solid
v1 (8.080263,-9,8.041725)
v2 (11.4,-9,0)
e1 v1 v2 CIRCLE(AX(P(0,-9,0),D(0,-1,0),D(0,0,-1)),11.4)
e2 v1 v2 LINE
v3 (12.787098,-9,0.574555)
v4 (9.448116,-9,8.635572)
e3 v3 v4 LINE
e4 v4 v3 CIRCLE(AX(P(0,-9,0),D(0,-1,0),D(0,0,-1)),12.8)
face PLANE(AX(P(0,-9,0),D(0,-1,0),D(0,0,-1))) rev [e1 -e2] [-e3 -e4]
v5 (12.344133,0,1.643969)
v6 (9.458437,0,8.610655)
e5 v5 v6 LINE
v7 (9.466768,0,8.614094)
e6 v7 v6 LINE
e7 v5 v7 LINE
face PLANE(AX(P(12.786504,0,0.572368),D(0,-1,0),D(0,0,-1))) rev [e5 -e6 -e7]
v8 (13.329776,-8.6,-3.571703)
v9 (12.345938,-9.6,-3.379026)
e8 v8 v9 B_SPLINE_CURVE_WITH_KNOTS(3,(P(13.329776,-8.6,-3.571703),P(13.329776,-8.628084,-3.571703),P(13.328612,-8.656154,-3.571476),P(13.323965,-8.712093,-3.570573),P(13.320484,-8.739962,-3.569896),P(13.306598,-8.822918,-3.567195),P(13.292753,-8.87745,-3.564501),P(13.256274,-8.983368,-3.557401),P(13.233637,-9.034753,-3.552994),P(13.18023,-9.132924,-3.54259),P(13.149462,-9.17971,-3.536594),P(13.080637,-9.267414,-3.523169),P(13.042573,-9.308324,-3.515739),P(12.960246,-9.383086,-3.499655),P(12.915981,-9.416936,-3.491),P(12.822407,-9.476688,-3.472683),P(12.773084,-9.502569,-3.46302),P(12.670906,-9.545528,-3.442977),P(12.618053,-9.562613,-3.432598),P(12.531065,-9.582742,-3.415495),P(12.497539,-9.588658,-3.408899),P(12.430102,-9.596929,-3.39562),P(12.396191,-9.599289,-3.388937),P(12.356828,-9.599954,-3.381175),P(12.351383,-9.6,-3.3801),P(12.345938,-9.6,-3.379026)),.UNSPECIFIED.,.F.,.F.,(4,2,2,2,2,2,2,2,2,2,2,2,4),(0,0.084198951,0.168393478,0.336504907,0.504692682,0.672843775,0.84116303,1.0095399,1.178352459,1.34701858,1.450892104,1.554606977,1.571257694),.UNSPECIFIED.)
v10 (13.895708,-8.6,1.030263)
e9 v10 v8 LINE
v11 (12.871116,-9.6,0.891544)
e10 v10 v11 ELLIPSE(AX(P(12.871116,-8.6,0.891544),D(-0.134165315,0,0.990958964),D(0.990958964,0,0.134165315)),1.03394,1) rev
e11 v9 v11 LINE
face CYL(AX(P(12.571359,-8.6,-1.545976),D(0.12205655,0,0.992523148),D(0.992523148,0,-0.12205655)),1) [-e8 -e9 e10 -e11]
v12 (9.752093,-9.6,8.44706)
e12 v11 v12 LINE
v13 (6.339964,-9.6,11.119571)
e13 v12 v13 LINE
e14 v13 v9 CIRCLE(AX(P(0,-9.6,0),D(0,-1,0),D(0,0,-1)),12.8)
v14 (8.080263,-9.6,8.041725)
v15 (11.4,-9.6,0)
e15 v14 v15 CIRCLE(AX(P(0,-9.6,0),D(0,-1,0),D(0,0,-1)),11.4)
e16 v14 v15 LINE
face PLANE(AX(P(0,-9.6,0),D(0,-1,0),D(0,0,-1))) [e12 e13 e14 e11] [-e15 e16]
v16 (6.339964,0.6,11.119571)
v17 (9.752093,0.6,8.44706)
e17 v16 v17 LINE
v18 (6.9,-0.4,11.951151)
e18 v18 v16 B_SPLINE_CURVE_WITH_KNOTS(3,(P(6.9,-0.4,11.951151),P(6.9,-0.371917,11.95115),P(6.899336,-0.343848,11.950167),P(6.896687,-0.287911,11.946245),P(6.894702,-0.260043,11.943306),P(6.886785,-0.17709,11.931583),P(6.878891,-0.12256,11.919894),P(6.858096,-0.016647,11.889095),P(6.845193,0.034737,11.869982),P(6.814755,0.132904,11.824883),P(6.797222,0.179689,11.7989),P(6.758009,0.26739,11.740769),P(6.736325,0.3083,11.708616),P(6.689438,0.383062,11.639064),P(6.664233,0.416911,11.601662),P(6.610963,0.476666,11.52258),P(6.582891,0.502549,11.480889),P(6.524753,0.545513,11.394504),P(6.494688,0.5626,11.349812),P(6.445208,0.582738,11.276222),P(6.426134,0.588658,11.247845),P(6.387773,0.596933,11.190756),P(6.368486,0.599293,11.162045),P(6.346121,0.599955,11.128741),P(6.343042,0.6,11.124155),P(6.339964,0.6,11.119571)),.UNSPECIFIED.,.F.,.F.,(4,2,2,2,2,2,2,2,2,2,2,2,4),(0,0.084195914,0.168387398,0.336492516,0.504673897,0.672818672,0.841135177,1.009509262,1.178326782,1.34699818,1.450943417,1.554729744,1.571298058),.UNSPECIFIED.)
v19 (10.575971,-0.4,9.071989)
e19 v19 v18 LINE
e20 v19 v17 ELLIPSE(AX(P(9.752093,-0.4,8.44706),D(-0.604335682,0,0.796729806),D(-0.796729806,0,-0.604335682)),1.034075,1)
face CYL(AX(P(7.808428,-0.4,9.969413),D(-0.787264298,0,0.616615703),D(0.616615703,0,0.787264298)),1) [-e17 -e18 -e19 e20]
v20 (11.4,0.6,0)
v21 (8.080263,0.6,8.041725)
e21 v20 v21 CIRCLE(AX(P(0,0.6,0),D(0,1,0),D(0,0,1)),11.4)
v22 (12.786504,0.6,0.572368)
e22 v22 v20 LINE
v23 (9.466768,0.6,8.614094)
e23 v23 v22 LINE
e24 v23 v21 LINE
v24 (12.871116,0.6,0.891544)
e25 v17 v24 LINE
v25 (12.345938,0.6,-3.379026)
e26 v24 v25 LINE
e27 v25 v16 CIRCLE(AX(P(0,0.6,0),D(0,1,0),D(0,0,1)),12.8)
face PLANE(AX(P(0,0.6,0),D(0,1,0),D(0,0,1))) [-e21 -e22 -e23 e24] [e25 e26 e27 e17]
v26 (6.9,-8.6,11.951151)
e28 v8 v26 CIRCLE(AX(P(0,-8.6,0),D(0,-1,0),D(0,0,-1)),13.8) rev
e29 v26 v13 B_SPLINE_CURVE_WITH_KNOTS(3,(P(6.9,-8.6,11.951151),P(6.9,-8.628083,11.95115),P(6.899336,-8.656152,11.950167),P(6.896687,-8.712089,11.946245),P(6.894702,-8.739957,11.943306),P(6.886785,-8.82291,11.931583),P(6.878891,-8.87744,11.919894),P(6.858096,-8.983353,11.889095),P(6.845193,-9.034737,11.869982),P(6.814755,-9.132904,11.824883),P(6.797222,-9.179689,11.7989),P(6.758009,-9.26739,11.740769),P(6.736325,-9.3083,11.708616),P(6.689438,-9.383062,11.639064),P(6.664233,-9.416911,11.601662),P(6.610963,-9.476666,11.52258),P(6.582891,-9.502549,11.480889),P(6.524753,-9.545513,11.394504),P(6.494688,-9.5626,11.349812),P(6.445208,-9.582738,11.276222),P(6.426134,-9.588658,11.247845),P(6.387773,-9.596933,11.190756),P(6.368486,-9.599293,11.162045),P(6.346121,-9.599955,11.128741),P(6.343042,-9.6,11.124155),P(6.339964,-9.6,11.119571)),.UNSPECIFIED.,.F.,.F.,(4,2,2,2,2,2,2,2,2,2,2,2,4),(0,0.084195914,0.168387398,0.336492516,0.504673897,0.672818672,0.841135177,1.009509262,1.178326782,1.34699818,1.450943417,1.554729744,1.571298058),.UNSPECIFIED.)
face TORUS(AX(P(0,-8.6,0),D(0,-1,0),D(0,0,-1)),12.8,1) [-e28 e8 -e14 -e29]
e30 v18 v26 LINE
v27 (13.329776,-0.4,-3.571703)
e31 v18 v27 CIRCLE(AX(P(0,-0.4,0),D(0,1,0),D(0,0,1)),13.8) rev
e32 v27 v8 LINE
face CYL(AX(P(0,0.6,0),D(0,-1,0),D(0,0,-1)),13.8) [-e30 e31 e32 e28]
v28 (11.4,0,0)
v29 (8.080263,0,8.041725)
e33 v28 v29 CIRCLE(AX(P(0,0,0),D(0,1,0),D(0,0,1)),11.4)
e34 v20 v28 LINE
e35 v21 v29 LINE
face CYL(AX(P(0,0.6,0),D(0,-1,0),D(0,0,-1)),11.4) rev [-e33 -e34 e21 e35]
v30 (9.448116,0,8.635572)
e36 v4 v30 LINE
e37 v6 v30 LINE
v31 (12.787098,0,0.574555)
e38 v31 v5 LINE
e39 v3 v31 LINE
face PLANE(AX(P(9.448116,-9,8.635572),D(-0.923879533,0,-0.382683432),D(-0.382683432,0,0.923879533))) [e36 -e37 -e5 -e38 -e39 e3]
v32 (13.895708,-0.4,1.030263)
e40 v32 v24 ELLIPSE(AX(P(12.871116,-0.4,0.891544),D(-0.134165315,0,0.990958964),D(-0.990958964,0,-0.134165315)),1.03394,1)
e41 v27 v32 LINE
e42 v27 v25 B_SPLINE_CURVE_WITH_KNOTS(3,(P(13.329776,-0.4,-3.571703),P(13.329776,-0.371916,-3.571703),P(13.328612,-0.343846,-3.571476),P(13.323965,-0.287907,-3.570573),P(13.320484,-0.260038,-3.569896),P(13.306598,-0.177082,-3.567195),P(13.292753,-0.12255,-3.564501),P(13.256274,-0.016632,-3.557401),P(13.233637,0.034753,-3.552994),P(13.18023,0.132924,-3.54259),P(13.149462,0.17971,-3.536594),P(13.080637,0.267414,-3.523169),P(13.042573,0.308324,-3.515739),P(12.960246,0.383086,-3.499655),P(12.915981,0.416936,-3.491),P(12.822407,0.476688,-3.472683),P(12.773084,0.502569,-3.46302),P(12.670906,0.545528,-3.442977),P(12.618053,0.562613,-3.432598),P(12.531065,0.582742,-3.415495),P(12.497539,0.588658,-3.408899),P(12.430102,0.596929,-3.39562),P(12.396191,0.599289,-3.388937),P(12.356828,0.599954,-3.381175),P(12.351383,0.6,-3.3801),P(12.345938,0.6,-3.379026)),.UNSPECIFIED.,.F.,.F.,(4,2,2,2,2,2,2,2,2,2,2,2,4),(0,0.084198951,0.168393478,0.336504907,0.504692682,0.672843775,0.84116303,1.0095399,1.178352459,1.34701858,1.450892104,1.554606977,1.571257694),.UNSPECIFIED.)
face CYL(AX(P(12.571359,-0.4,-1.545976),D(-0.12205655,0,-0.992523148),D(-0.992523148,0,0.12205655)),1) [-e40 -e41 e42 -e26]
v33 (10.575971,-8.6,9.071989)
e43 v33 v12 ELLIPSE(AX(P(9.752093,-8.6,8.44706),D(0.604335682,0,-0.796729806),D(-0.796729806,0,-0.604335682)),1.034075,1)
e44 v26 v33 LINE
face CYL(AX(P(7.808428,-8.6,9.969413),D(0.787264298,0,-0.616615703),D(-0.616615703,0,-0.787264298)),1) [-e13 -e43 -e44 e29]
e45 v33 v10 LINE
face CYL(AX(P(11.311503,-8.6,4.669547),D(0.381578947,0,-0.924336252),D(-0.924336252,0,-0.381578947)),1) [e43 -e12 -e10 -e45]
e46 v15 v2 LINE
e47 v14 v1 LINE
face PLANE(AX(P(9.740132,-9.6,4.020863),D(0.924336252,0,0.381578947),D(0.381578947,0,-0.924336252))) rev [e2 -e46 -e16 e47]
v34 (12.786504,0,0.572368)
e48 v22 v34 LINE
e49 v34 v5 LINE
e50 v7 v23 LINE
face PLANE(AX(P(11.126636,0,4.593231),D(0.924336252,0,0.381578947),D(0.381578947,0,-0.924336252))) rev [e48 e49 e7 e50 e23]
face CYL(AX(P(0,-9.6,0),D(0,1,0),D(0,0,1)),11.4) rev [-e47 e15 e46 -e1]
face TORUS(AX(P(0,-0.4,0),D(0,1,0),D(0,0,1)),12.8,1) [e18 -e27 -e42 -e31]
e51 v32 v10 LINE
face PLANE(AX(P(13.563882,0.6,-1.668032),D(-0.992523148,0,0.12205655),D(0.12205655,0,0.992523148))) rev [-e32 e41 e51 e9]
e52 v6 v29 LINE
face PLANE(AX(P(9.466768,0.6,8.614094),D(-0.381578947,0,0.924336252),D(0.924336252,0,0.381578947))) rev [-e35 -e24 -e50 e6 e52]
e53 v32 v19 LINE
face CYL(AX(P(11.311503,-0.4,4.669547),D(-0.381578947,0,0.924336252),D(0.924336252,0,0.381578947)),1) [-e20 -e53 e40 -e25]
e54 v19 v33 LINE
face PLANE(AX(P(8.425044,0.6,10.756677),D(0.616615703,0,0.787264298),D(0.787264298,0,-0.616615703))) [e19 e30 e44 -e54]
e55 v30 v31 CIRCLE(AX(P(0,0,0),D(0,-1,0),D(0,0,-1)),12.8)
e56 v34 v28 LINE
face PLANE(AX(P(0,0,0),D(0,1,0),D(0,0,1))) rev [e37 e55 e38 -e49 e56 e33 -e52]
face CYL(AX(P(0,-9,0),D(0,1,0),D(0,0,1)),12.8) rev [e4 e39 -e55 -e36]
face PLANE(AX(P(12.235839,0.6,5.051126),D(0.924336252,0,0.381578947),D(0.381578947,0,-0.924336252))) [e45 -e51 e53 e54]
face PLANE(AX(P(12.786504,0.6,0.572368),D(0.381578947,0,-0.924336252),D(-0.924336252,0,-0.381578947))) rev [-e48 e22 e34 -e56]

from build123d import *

# Parameters (mm, degrees)
EXTRUDE_1_DEPTH     = 0.6
EXTRUDE_START       = 9
EXTRUDE_3_DEPTH     = 9
EXTRUDE_START_2     = 0.6
EXTRUDE_4_DEPTH     = 0.6
FILLET_1_R          = 1
FILLET_2_R          = 1
SKETCH_7_W          = 8.7
SKETCH_7_H          = 0.6
CUT_EXTRUDE_1_DEPTH = 1.5


with BuildPart() as part:
    # 草图1 → 凸台-拉伸1 (new body)
    with BuildSketch(Plane(origin=(0, 0, 0), x_dir=(1, 0, 0), z_dir=(0, 1, 0))):
        with BuildLine():
            Line((10.575971039, -9.071988551), (13.895707881, -1.030263158))
            Line((13.895707881, -1.030263158), (13.329776403, 3.571702822))
            ThreePointArc((13.329776403, 3.571702822), (-12.749537549, 5.281031367), (6.9, -11.951150572))
            Line((6.9, -11.951150572), (10.575971039, -9.071988551))
        make_face()
        with BuildLine():
            ThreePointArc((8.080263158, -8.041725393), (-10.537433274, 4.35), (11.4, 0))
            Line((11.4, 0), (8.080263158, -8.041725393))
        make_face(mode=Mode.SUBTRACT)
    extrude(amount=EXTRUDE_1_DEPTH)

    # 草图2 → 凸台-拉伸3 (add)
    with BuildSketch(Plane(origin=(0, 0, 0), x_dir=(-1, 0, 0), z_dir=(0, -1, 0)).offset(EXTRUDE_START)):
        with BuildLine():
            Line((-13.895707881, -1.030263158), (-10.575971039, -9.071988551))
            Line((-10.575971039, -9.071988551), (-6.9, -11.951150572))
            ThreePointArc((-6.9, -11.951150572), (12.749537549, 5.281031367), (-13.329776403, 3.571702822))
            Line((-13.329776403, 3.571702822), (-13.895707881, -1.030263158))
        make_face()
        with BuildLine():
            Line((-9.448115748, -8.635572293), (-12.787098442, -0.574554987))
            ThreePointArc((-12.787098442, -0.574554987), (11.825658016, 4.898347934), (-9.448115748, -8.635572293))
        make_face(mode=Mode.SUBTRACT)
    extrude(amount=-EXTRUDE_3_DEPTH)

    # 草图5 → 凸台-拉伸4 (add)
    with BuildSketch(Plane(origin=(0, -9, 0), x_dir=(-1, 0, 0), z_dir=(0, -1, 0)).offset(EXTRUDE_START_2)):
        with BuildLine():
            Line((-13.895707881, -1.030263158), (-10.575971039, -9.071988551))
            Line((-10.575971039, -9.071988551), (-6.9, -11.951150572))
            ThreePointArc((-6.9, -11.951150572), (12.749537549, 5.281031367), (-13.329776403, 3.571702822))
            Line((-13.329776403, 3.571702822), (-13.895707881, -1.030263158))
        make_face()
        with BuildLine():
            ThreePointArc((-11.4, 0), (10.537433274, 4.35), (-8.080263158, -8.041725393))
            Line((-8.080263158, -8.041725393), (-11.4, 0))
        make_face(mode=Mode.SUBTRACT)
    extrude(amount=-EXTRUDE_4_DEPTH)

    # 圆角1
    fillet_1_edges = [part.edges().sort_by_distance(p)[0] for p in [
        (13.612742142, -9.6, -1.270719832),
        (-12.749537549, -9.6, -5.281031367),
        (8.737985519, -9.6, 10.511569562),
        (12.23583946, -9.6, 5.051125854),
    ]]
    fillet(fillet_1_edges, radius=FILLET_1_R)

    # 圆角2
    fillet_2_edges = [part.edges().sort_by_distance(p)[0] for p in [
        (13.612742142, 0.6, -1.270719832),
        (-12.749537549, 0.6, -5.281031367),
        (8.737985519, 0.6, 10.511569562),
        (12.23583946, 0.6, 5.051125854),
    ]]
    fillet(fillet_2_edges, radius=FILLET_2_R)

    # 草图7 → 切除-拉伸1 (cut)
    with BuildSketch(Plane(origin=(9.740131579, 0, 4.020862697), x_dir=(-0.381578947368421, 0, 0.9243362520886043), z_dir=(-0.9243362520886043, 0, -0.381578947368421))):
        with Locations((0, 0.3)):
            Rectangle(SKETCH_7_W, SKETCH_7_H)
    extrude(amount=-CUT_EXTRUDE_1_DEPTH, mode=Mode.SUBTRACT)


solid = part.part
